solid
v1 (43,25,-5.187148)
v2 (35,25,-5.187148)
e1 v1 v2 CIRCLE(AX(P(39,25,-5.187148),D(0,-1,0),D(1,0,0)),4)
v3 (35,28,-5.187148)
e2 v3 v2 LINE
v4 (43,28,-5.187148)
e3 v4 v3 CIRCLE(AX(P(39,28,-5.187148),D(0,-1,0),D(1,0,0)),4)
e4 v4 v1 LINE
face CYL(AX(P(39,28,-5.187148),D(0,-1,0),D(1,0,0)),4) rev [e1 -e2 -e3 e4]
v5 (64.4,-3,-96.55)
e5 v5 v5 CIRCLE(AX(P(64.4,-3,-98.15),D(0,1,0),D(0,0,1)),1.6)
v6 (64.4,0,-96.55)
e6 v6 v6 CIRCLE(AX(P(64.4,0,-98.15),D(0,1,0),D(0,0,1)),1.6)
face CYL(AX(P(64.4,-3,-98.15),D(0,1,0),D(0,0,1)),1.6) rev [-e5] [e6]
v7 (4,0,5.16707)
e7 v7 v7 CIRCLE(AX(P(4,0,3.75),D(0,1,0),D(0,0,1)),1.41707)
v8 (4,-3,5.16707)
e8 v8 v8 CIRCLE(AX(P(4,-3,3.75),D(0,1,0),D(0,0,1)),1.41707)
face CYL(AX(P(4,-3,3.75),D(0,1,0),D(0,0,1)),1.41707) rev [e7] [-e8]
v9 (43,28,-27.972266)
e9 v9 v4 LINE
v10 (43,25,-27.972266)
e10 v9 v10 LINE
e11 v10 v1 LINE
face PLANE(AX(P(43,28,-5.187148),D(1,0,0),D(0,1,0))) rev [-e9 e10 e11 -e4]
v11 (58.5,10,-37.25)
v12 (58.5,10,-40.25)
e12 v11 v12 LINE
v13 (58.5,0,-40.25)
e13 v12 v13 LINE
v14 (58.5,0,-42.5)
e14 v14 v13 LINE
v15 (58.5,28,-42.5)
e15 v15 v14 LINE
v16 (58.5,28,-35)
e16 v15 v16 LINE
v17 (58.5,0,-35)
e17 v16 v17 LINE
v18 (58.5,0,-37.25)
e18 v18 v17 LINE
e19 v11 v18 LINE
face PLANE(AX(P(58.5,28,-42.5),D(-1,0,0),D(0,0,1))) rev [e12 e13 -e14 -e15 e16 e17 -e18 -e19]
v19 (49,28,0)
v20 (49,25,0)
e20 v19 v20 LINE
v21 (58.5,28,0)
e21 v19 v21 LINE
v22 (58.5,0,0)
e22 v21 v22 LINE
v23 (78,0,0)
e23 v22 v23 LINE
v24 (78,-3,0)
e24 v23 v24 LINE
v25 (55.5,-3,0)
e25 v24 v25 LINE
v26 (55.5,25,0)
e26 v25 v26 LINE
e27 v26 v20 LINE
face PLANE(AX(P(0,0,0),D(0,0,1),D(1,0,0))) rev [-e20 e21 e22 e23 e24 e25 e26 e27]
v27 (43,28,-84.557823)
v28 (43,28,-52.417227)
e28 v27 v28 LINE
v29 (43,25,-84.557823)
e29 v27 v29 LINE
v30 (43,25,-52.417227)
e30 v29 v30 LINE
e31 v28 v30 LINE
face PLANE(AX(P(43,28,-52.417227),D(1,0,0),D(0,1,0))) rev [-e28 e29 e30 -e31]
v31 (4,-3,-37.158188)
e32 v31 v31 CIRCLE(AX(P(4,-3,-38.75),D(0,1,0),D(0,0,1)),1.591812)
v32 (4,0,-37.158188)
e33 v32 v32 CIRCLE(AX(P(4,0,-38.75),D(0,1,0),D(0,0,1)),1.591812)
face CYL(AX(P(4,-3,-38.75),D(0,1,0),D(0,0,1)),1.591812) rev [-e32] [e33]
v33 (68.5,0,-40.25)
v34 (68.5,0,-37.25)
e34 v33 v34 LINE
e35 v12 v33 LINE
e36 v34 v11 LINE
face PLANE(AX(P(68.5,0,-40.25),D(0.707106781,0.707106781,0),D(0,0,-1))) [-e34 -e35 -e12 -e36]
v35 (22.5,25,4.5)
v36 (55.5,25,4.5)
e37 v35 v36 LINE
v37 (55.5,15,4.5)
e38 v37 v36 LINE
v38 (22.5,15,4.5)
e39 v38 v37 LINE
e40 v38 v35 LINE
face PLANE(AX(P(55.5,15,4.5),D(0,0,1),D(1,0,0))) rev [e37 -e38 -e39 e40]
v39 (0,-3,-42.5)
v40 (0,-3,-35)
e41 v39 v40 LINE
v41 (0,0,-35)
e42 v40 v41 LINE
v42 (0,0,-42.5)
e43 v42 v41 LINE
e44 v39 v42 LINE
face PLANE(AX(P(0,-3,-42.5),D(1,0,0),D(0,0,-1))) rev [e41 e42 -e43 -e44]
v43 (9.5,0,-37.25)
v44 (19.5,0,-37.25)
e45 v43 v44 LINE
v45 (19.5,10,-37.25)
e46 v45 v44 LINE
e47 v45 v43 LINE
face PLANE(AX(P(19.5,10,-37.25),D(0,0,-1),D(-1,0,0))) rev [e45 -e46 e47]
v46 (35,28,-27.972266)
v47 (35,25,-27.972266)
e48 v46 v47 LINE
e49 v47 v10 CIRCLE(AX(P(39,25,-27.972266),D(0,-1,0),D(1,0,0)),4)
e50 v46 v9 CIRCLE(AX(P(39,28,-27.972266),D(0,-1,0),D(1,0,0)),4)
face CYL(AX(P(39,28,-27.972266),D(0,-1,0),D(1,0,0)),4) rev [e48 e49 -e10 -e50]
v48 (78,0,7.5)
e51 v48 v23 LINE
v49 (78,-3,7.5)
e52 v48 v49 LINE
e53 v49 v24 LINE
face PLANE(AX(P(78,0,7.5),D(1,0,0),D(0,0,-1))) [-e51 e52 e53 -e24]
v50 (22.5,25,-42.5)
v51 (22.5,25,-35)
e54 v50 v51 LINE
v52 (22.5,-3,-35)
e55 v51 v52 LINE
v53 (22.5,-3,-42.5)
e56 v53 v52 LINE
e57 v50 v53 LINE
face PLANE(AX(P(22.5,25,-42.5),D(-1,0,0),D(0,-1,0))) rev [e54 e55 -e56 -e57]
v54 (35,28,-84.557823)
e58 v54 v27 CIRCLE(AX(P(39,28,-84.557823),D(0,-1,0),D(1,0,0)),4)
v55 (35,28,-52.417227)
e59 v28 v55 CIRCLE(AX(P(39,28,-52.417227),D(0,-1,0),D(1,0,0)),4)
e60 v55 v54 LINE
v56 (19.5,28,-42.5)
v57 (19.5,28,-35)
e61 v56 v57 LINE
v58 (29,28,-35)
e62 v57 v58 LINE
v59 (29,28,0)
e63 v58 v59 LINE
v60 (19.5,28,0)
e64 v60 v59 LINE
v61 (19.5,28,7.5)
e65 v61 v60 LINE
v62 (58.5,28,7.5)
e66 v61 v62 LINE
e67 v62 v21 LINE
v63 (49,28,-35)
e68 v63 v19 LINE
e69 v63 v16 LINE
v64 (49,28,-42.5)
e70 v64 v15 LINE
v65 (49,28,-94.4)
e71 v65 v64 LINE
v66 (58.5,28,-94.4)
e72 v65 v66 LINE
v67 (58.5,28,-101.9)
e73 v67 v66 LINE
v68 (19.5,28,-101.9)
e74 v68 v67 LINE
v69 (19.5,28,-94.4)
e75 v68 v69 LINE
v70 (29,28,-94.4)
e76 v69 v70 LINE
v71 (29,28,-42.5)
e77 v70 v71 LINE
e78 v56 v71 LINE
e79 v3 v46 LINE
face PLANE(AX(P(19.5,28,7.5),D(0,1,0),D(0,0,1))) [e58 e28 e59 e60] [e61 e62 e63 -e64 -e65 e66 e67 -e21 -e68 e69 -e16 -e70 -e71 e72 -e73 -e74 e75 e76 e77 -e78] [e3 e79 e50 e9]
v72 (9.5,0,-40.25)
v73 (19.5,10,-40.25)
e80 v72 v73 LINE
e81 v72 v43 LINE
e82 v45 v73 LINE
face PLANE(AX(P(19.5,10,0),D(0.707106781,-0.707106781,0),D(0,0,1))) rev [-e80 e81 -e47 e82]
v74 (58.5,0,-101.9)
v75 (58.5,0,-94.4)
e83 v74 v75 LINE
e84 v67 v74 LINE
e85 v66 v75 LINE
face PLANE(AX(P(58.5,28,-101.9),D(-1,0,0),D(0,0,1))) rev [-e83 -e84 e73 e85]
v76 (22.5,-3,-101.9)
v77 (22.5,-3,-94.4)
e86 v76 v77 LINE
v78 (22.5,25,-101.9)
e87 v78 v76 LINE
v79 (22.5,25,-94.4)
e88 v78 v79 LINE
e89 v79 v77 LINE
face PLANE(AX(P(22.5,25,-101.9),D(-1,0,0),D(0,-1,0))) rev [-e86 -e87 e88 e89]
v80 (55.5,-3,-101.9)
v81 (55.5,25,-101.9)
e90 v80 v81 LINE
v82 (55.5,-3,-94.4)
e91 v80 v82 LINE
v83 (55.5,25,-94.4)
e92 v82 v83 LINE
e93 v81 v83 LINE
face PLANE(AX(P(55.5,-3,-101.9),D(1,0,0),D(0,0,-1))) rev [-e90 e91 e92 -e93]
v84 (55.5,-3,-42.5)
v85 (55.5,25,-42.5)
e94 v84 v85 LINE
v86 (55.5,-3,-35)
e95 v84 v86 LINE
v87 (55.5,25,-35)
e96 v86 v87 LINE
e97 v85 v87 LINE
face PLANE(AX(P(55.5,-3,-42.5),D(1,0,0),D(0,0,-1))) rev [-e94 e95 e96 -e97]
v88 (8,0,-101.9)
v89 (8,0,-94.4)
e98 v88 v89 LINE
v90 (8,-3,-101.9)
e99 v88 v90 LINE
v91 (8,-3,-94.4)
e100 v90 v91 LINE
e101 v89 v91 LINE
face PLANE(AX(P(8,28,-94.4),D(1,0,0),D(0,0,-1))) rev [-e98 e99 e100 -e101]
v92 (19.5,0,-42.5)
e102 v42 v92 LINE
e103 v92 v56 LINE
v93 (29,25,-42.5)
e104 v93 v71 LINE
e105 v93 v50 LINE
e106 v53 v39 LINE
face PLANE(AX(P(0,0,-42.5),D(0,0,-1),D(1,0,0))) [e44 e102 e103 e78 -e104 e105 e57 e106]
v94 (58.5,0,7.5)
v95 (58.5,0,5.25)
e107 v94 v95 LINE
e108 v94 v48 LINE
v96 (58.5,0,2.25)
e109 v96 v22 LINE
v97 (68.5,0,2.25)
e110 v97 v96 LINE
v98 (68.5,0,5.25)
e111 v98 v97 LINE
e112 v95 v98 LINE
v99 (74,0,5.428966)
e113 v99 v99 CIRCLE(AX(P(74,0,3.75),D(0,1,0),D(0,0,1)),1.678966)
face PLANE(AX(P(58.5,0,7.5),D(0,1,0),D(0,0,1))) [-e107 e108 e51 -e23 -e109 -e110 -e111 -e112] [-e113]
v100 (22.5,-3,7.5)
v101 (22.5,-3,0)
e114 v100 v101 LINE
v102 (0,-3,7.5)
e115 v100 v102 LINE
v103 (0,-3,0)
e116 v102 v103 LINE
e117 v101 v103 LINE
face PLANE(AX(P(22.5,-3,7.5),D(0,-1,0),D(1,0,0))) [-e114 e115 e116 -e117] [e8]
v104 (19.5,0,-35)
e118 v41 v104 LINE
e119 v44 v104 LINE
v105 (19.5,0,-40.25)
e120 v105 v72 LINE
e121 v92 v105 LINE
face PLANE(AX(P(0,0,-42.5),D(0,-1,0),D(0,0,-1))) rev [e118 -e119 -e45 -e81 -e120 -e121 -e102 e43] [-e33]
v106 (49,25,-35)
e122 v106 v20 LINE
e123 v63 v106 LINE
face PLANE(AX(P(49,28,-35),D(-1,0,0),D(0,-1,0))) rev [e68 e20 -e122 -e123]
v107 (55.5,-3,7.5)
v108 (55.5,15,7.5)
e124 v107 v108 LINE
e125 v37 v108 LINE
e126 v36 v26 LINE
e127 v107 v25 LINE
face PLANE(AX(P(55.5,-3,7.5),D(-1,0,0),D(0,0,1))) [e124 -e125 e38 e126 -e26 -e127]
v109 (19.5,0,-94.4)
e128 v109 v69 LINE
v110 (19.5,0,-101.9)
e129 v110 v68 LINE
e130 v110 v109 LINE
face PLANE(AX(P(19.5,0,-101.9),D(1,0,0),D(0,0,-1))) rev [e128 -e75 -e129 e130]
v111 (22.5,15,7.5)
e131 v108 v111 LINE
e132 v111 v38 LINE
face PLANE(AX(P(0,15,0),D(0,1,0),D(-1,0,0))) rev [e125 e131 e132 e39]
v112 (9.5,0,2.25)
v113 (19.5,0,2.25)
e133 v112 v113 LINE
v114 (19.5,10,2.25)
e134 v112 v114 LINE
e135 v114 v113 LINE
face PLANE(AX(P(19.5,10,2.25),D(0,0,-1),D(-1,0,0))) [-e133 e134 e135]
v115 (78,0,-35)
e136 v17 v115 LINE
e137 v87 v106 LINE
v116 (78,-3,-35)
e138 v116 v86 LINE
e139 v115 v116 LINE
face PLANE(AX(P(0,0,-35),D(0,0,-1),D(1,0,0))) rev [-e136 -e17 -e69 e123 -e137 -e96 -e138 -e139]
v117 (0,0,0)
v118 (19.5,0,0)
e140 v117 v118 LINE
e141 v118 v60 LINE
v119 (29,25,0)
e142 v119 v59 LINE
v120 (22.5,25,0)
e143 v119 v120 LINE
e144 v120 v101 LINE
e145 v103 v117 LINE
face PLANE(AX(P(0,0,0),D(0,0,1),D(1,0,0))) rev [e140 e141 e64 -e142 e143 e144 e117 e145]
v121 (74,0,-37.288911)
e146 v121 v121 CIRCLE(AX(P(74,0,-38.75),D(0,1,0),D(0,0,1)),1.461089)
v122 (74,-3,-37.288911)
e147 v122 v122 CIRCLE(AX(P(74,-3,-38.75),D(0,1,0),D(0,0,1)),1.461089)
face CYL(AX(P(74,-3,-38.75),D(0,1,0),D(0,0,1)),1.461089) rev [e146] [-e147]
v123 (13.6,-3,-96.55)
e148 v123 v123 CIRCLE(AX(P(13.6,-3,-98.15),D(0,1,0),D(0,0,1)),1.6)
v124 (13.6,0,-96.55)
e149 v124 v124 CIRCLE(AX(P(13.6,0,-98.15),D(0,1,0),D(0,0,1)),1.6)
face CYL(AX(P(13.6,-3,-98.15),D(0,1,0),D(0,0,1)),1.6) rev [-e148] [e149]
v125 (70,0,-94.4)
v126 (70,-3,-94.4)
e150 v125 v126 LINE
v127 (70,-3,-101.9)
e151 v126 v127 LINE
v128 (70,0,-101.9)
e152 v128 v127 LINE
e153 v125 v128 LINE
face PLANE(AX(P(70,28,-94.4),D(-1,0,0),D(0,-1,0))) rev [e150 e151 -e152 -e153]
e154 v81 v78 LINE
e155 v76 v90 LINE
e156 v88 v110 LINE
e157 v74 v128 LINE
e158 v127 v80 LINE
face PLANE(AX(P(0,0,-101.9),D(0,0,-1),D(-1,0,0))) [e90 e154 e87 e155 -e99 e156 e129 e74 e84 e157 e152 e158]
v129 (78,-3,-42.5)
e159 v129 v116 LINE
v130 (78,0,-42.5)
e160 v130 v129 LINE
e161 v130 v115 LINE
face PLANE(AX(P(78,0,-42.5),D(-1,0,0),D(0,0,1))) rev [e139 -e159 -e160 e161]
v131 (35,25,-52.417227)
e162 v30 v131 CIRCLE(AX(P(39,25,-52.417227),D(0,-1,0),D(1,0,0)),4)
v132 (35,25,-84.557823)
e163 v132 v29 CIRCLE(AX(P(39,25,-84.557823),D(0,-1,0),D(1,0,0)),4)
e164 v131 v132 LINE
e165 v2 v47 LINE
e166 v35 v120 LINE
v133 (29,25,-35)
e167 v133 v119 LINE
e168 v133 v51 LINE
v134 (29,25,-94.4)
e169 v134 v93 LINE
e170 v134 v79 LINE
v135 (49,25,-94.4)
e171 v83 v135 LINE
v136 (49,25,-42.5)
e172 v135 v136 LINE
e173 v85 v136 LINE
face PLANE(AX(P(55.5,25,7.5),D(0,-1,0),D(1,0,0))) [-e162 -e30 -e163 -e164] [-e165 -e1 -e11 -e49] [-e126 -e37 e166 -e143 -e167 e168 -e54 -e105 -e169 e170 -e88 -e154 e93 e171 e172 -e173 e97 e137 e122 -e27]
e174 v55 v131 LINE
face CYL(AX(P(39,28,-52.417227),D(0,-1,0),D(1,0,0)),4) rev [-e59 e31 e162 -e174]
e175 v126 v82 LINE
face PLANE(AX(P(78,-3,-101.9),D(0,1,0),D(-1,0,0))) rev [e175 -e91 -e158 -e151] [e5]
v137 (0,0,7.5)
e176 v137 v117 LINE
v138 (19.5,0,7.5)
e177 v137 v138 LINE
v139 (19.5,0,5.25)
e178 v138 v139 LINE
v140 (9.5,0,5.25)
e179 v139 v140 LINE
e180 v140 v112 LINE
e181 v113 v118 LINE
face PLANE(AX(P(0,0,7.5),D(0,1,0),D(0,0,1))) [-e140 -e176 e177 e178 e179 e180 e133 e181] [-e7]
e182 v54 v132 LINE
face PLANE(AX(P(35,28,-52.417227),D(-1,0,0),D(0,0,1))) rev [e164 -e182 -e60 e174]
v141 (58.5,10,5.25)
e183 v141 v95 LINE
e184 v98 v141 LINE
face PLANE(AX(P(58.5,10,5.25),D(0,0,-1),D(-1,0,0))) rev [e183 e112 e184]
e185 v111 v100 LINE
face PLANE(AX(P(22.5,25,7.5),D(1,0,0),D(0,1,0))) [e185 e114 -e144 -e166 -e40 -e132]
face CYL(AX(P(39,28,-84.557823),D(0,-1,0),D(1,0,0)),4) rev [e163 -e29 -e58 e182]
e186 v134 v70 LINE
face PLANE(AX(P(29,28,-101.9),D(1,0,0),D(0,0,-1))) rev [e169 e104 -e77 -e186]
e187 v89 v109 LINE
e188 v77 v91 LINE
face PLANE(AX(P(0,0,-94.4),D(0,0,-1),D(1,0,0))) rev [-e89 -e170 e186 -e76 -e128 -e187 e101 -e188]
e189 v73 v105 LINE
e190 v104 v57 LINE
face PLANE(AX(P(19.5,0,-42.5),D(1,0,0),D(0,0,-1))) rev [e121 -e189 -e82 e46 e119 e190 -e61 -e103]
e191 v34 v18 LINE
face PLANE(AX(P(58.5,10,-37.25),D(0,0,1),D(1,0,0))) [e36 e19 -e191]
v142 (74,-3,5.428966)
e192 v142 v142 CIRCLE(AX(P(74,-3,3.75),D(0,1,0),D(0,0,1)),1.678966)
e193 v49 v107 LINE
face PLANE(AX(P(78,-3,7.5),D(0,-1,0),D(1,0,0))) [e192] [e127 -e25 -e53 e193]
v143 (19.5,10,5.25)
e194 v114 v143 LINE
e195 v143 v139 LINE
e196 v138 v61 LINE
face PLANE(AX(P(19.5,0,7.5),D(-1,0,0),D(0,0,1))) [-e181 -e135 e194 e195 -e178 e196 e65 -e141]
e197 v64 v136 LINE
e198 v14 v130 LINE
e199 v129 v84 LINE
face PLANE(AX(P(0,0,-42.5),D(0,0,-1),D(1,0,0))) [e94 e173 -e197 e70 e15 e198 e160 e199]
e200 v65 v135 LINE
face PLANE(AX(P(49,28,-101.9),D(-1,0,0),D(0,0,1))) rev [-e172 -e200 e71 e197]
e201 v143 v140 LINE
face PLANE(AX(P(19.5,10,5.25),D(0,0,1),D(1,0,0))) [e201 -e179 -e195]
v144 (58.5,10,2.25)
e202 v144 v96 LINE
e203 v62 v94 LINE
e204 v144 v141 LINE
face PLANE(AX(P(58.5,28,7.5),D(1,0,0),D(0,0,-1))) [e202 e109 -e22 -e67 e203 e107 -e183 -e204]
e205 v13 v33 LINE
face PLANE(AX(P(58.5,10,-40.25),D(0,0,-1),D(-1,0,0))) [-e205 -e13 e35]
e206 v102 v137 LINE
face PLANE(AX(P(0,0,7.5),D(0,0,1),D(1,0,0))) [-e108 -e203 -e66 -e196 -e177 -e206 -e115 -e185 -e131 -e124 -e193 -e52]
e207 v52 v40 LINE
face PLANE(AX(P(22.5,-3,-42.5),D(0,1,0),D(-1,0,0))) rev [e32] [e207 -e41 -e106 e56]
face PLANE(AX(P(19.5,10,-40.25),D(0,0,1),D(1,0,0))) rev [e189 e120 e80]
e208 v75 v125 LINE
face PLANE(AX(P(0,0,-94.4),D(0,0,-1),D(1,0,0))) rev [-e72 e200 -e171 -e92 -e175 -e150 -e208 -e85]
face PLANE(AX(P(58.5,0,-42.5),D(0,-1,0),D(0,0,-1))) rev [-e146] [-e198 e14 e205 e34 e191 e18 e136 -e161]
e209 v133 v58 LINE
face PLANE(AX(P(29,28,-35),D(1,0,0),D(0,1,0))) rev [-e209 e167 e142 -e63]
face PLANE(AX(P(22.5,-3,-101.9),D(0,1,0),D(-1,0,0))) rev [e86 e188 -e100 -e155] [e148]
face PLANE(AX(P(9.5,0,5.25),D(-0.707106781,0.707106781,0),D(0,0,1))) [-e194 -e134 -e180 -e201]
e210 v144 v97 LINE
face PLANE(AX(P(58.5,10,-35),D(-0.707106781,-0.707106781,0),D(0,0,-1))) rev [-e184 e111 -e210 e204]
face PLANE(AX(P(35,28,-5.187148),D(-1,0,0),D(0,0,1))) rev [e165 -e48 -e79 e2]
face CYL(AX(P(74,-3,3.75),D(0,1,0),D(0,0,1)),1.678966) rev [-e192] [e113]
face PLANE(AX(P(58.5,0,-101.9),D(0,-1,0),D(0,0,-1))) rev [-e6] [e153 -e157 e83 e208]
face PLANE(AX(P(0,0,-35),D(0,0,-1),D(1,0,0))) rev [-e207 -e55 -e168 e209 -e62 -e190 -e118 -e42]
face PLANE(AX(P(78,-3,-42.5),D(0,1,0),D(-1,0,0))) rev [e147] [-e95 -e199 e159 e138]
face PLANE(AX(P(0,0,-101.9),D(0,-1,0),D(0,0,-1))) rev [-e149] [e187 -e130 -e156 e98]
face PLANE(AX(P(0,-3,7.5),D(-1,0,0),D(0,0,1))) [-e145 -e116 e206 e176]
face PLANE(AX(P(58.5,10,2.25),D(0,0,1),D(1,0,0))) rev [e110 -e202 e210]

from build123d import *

# Parameters (mm, degrees)
BOSS_EXTRUDE1_DEPTH      = 7.5
SKETCH4_W                = 20
SKETCH4_H                = 3
BOSS_EXTRUDE2_DEPTH      = 35
SKETCH6_W                = 20
SKETCH6_H                = 3
BOSS_EXTRUDE3_DEPTH      = 59.4
SKETCH5_R                = 1.678965669
SKETCH5_R_2              = 1.417070449
SKETCH5_R_3              = 1.591812116
SKETCH5_R_4              = 1.461089302
CUT_EXTRUDE1_DEPTH       = 132.345384388
SKETCH7_R                = 1.6
CUT_EXTRUDE2_DEPTH       = 132.345384388
SKETCH10_W               = 33
SKETCH10_H               = 3
BOSS_EXTRUDE4_DEPTH      = 10
SKETCH11_W               = 8
SKETCH11_H               = 7.5
CUT_EXTRUDE4_DEPTH       = 133.017460966
SKETCH12_W               = 10
SKETCH12_H               = 3
BOSS_EXTRUDE5_DEPTH      = 10
CHAMFER1_SIZE            = 10
CHAMFER1_OF_MIRROR6_SIZE = 10
MIRROR7_START            = -40.25
MIRROR7_DEPTH            = 3
MIRROR7_START_2          = 2.25
MIRROR7_2_DEPTH          = 3
CUT_EXTRUDE5_DEPTH       = 132.345384388


# Read off the part's stored shape, not the designer's step: Mirror7
with BuildPart() as part:
    # Sketch3 → Boss-Extrude1 (new body)
    with BuildSketch(Plane.XY):
        Polygon((0, 0), (19.5, 0), (19.5, 28), (58.5, 28), (58.5, 0), (78, 0), (78, -3), (55.5, -3), (55.5, 25), (22.5, 25), (22.5, -3), (0, -3), align=None)
    boss_extrude1 = extrude(amount=BOSS_EXTRUDE1_DEPTH)

    # Sketch4 → Boss-Extrude2 (add)
    with BuildSketch(Plane(origin=(0, 0, 0), x_dir=(-1, 0, 0), z_dir=(0, 0, -1))):
        with Locations((-39, 26.5)):
            Rectangle(SKETCH4_W, SKETCH4_H)
    extrude(amount=BOSS_EXTRUDE2_DEPTH)

    # Mirror1: Boss-Extrude1 across plane
    add(boss_extrude1.mirror(Plane(origin=(0, 0, -17.5), x_dir=(1, 0, 0), z_dir=(0, 0, -1))))

    # Sketch6 → Boss-Extrude3 (add)
    with BuildSketch(Plane(origin=(0, 0, -42.5), x_dir=(-1, 0, 0), z_dir=(0, 0, -1))):
        with Locations((-39, 26.5)):
            Rectangle(SKETCH6_W, SKETCH6_H)
    extrude(amount=BOSS_EXTRUDE3_DEPTH)

    # Sketch5 → Cut-Extrude1 (cut, through all)
    with BuildSketch(Plane(origin=(0, 0, 0), x_dir=(1, 0, 0), z_dir=(0, 1, 0))):
        with Locations(Location((74, -3.75, 0), (0, 0, 270))):
            Circle(SKETCH5_R)
        with Locations(Location((4, -3.75, 0), (0, 0, 270))):
            Circle(SKETCH5_R_2)
        with Locations(Location((4, 38.75, 0), (0, 0, 270))):
            Circle(SKETCH5_R_3)
        with Locations(Location((74, 38.75, 0), (0, 0, 270))):
            Circle(SKETCH5_R_4)
    extrude(amount=-CUT_EXTRUDE1_DEPTH, mode=Mode.SUBTRACT)

    # Mirror5: Boss-Extrude1 across plane
    add(boss_extrude1.mirror(Plane(origin=(0, 0, -47.2), x_dir=(1, 0, 0), z_dir=(0, 0, -1))))

    # Sketch7 → Cut-Extrude2 (cut, through all)
    with BuildSketch(Plane(origin=(0, 0, 0), x_dir=(1, 0, 0), z_dir=(0, 1, 0))):
        with Locations(Location((64.4, 98.15, 0), (0, 0, 270))):
            Circle(SKETCH7_R)
        with Locations(Location((13.6, 98.15, 0), (0, 0, 270))):
            Circle(SKETCH7_R)
    extrude(amount=-CUT_EXTRUDE2_DEPTH, mode=Mode.SUBTRACT)

    # Sketch10 → Boss-Extrude4 (add)
    with BuildSketch(Plane.XZ.offset(-25)):
        with Locations((39, 6)):
            Rectangle(SKETCH10_W, SKETCH10_H)
    extrude(amount=BOSS_EXTRUDE4_DEPTH)

    # Sketch11 → Cut-Extrude4 (cut, through all)
    with BuildSketch(Plane.XZ.offset(3)):
        with Locations((4, -98.15)):
            Rectangle(SKETCH11_W, SKETCH11_H)
        with Locations((74, -98.15)):
            Rectangle(SKETCH11_W, SKETCH11_H)
    extrude(amount=-CUT_EXTRUDE4_DEPTH, mode=Mode.SUBTRACT)

    # Sketch12 → Boss-Extrude5 (add)
    with BuildSketch(Plane(origin=(0, 0, 0), x_dir=(1, 0, 0), z_dir=(0, 1, 0))):
        with Locations((14.5, 38.75)):
            Rectangle(SKETCH12_W, SKETCH12_H)
    boss_extrude5 = extrude(amount=BOSS_EXTRUDE5_DEPTH)

    # Chamfer1
    chamfer1_edges = [part.edges().sort_by_distance(p)[0] for p in [
        (9.5, 10, -38.75),
    ]]
    chamfer(chamfer1_edges, length=CHAMFER1_SIZE - 0.0001)  # a hair under: the kernel refuses the full size

    # Mirror6: Boss-Extrude5 across plane
    add(boss_extrude5.mirror(Plane.XY.offset(-17.5)))

    # Chamfer1 of Mirror6
    chamfer1_of_mirror6_edges = [part.edges().sort_by_distance(p)[0] for p in [
        (9.5, 10, 3.75),
    ]]
    chamfer(chamfer1_of_mirror6_edges, length=CHAMFER1_OF_MIRROR6_SIZE - 0.0001)  # a hair under: the kernel refuses the full size

    # Mirror7 outline → Mirror7 (add)
    with BuildSketch(Plane.XY.offset(MIRROR7_START)):
        Polygon((58.5, 0), (68.5, 0), (58.5, 10), align=None)
    extrude(amount=MIRROR7_DEPTH)

    # Mirror7 2 outline → Mirror7 2 (add)
    with BuildSketch(Plane.XY.offset(MIRROR7_START_2)):
        Polygon((58.5, 0), (68.5, 0), (58.5, 10), align=None)
    extrude(amount=MIRROR7_2_DEPTH)

    # Sketch13 → Cut-Extrude5 (cut, through all)
    with BuildSketch(Plane.XZ.offset(-25)):
        with BuildLine():
            Line((43, -5.187147638), (43, -27.972265557))
            ThreePointArc((43, -27.972265557), (39, -31.972265557), (35, -27.972265557))
            Line((35, -27.972265557), (35, -5.187147638))
            ThreePointArc((35, -5.187147638), (39, -1.187147638), (43, -5.187147638))
        make_face()
        with BuildLine():
            Line((43, -52.417226503), (43, -84.557823303))
            ThreePointArc((43, -84.557823303), (39, -88.557823303), (35, -84.557823303))
            Line((35, -84.557823303), (35, -52.417226503))
            ThreePointArc((35, -52.417226503), (39, -48.417226503), (43, -52.417226503))
        make_face()
    extrude(amount=-CUT_EXTRUDE5_DEPTH, mode=Mode.SUBTRACT)


solid = part.part
